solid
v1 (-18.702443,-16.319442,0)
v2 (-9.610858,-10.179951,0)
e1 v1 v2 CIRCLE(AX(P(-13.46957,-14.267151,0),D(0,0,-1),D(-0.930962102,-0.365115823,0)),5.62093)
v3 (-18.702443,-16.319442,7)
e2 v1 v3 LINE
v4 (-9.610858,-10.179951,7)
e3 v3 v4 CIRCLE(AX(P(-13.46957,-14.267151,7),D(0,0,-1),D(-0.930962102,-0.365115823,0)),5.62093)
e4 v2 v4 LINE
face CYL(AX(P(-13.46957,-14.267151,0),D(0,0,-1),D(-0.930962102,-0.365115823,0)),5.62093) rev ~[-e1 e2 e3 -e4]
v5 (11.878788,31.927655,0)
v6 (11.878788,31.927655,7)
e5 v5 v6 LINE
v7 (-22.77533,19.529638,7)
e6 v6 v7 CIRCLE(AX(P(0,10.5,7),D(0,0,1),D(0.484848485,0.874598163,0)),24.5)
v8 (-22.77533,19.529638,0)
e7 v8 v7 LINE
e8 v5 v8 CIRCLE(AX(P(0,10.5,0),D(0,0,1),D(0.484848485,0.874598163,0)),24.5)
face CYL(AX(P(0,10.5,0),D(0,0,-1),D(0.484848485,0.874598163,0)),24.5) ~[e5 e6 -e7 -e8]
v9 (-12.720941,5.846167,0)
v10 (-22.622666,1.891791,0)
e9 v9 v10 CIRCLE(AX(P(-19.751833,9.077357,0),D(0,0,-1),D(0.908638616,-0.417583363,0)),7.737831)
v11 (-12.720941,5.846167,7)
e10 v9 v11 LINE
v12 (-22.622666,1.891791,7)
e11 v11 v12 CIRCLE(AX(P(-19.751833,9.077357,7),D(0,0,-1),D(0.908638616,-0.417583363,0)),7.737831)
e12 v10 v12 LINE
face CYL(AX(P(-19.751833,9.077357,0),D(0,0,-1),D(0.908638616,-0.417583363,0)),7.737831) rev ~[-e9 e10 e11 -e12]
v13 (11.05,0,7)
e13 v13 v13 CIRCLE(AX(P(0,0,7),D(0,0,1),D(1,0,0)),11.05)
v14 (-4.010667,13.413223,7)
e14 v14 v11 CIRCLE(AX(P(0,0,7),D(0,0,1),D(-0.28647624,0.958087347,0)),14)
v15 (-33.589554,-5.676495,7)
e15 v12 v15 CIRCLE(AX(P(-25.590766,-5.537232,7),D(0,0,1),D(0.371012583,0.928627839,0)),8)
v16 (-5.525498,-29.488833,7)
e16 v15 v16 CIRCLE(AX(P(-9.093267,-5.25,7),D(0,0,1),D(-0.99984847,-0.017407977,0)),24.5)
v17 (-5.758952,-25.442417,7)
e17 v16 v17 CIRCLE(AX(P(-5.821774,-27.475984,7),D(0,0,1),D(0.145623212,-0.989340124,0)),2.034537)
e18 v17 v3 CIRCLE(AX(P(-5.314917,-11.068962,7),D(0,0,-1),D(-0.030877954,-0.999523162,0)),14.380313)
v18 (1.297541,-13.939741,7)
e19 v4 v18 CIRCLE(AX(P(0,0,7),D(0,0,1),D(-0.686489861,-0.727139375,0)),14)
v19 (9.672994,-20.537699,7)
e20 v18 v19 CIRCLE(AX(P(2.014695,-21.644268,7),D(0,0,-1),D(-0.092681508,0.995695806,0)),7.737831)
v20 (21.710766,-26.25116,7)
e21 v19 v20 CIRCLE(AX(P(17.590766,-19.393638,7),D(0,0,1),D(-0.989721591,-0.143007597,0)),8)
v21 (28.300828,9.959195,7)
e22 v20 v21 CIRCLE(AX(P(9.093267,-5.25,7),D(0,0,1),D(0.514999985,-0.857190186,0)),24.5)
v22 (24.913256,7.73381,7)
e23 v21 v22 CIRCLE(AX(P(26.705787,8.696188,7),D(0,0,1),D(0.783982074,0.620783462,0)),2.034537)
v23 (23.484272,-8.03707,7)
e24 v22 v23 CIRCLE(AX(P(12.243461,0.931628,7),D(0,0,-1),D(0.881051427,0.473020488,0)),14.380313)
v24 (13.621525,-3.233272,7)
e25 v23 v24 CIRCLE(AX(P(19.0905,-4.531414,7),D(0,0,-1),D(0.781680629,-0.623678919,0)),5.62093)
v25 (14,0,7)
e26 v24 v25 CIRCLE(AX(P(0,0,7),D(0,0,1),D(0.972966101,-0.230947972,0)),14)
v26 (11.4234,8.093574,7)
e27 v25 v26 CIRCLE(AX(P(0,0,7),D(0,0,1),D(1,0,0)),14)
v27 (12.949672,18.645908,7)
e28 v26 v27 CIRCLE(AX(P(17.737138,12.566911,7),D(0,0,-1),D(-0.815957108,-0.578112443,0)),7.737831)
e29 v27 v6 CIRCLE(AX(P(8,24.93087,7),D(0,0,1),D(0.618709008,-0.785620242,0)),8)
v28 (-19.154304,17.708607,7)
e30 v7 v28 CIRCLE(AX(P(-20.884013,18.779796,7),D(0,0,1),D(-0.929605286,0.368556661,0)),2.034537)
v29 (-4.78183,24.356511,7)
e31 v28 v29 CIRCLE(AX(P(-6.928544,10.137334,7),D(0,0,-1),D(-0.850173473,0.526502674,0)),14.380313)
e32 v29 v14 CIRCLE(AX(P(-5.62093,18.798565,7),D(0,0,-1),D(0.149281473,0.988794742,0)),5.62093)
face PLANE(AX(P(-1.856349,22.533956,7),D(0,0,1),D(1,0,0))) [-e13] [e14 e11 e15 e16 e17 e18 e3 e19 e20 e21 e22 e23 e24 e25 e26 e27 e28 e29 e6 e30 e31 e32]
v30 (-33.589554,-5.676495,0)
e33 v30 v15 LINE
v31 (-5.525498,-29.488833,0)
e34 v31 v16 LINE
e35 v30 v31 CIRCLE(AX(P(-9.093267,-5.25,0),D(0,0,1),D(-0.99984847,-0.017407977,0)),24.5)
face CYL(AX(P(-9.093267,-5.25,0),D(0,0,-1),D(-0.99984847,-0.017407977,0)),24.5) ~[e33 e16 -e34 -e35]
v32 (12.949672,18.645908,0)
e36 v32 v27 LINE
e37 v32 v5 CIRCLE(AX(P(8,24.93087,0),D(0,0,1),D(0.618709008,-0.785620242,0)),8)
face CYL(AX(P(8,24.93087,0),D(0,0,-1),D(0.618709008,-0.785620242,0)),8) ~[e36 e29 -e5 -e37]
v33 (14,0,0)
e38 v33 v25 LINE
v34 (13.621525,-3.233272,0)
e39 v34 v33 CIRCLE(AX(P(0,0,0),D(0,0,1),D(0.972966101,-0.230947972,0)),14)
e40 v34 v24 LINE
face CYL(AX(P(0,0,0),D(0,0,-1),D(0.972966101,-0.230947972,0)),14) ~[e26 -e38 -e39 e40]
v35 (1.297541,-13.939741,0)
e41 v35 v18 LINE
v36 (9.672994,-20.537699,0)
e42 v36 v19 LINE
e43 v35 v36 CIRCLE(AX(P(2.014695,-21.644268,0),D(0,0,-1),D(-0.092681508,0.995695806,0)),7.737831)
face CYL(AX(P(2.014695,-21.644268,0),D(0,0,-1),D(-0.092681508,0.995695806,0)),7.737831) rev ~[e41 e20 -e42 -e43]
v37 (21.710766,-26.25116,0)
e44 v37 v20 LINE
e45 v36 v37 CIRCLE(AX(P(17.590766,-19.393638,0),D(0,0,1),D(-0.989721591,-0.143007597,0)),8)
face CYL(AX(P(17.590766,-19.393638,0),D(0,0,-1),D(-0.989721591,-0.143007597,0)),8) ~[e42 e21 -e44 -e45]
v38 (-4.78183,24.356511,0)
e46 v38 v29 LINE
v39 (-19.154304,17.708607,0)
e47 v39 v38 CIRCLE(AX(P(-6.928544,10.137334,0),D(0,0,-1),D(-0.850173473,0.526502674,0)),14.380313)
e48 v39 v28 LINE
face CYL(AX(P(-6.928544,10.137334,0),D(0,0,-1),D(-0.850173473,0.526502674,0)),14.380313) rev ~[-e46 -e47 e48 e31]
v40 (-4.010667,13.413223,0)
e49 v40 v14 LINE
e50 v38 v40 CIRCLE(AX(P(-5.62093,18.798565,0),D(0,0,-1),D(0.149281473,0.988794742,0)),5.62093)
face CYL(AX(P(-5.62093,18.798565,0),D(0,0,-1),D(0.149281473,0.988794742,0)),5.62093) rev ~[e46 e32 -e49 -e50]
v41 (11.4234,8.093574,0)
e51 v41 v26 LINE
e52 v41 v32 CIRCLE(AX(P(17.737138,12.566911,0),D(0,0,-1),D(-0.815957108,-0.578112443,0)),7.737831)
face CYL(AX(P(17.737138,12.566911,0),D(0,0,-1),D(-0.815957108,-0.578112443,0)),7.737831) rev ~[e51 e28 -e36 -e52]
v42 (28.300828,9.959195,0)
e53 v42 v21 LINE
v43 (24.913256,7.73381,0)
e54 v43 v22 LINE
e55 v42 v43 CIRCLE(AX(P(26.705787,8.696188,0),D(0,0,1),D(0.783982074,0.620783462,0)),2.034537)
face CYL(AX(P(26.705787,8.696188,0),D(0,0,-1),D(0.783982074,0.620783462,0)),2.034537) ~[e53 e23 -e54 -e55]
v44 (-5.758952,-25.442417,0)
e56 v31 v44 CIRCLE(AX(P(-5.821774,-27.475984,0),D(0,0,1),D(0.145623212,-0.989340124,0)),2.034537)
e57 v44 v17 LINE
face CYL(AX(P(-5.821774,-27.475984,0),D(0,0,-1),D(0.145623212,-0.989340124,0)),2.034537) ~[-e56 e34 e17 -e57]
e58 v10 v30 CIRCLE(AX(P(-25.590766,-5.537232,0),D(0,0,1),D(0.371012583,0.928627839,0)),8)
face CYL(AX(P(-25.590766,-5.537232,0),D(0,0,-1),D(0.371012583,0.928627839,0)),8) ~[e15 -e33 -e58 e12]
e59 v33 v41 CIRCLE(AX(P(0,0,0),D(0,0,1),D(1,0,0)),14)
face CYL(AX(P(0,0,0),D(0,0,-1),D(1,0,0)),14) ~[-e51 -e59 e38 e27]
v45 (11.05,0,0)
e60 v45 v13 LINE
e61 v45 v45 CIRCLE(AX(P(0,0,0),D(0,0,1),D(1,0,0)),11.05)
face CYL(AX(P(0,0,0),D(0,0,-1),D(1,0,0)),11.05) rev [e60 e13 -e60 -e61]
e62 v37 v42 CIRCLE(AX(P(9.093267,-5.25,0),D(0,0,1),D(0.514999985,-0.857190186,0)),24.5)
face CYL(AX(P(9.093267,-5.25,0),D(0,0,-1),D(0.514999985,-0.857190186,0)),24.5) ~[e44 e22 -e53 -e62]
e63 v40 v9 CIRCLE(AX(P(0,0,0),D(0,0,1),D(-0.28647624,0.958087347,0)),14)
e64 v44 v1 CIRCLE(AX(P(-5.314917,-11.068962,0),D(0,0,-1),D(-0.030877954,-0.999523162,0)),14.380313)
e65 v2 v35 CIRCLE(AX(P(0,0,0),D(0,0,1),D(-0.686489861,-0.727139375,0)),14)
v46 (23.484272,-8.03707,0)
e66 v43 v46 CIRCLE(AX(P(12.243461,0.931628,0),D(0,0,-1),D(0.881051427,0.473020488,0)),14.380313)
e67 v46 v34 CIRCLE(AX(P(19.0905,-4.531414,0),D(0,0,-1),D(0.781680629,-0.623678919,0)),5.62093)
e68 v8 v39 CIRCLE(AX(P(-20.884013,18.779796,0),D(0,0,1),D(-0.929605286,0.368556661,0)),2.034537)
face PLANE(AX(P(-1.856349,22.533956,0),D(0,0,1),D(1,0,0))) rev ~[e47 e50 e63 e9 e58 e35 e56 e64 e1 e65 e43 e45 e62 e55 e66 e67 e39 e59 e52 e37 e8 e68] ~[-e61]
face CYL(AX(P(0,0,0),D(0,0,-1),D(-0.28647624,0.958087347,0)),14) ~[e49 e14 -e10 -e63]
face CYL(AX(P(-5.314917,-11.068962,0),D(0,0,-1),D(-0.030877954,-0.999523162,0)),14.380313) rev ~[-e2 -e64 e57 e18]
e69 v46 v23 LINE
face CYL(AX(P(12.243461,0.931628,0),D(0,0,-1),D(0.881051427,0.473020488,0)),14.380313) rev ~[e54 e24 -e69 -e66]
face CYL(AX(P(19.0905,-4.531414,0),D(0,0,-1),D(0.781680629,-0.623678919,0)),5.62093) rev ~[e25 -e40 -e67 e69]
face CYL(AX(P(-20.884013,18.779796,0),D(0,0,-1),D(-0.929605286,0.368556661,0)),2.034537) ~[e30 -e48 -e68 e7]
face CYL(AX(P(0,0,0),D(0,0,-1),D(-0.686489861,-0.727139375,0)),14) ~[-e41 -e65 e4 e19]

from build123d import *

# Parameters (mm, degrees)
F0_R     = 11.05
F1_DEPTH = 7


# Not quite as in the source:
# - a feature names something its author has since deleted; it is built from what else it names


with BuildPart() as f1:
    # F0 (on Top) → F1 (new body)
    with BuildSketch(Plane.XY):
        with BuildLine():
            ThreePointArc((-4.0106673609, 13.4132228536), (4.561996815, 13.2358673709), (11.4233995183, 8.0935742071))
            ThreePointArc((11.4233995183, 8.0935742071), (10.0789971933, 13.6745719731), (12.9496720608, 18.6459077574))
            ThreePointArc((12.9496720608, 18.6459077574), (15.9741224369, 25.5738093143), (11.8787878788, 31.9276549937))
            ThreePointArc((11.8787878788, 31.9276549937), (-8.2529606774, 33.568130398), (-22.7753295029, 19.5296382006))
            ThreePointArc((-22.7753295029, 19.5296382006), (-21.7981073273, 16.9621679379), (-19.1543041216, 17.7086070442))
            ThreePointArc((-19.1543041216, 17.7086070442), (-12.9655505969, 23.1890748663), (-4.7818295921, 24.3565114828))
            ThreePointArc((-4.7818295921, 24.3565114828), (-0.0139046539, 19.1936864048), (-4.0106673609, 13.4132228536))
        make_face()
        with BuildLine():
            ThreePointArc((13.6215254183, -3.2332716061), (13.9050594363, -1.6276738223), (14, 0))
            ThreePointArc((14, 0), (13.3403072164, 4.2469051522), (11.4233995183, 8.0935742071))
            ThreePointArc((11.4233995183, 8.0935742071), (4.561996815, 13.2358673709), (-4.0106673609, 13.4132228536))
            ThreePointArc((-4.0106673609, 13.4132228536), (-9.1815989768, 10.5687388192), (-12.7209406299, 5.8461670769))
            ThreePointArc((-12.7209406299, 5.8461670769), (-13.7435957918, -2.6671285517), (-9.6108580574, -10.1799512475))
            ThreePointArc((-9.6108580574, -10.1799512475), (-4.561996815, -13.2358673709), (1.2975411116, -13.939741284))
            ThreePointArc((1.2975411116, -13.939741284), (9.1815989768, -10.5687388192), (13.6215254183, -3.2332716061))
        make_face()
        Circle(F0_R, mode=Mode.SUBTRACT)
        with BuildLine():
            ThreePointArc((-9.6108580574, -10.1799512475), (-13.7435957918, -2.6671285517), (-12.7209406299, 5.8461670769))
            ThreePointArc((-12.7209406299, 5.8461670769), (-16.8820253112, 1.8913816276), (-22.6226658249, 1.8917910967))
            ThreePointArc((-22.6226658249, 1.8917910967), (-30.1346297562, 1.0470911764), (-33.5895542472, -5.6764954277))
            ThreePointArc((-33.5895542472, -5.6764954277), (-24.9443733435, -23.931338802), (-5.5254980569, -29.4888330294))
            ThreePointArc((-5.5254980569, -29.4888330294), (-3.7906146738, -27.3587986688), (-5.7589515051, -25.4424174832))
            ThreePointArc((-5.7589515051, -25.4424174832), (-13.5995526261, -22.8230336242), (-18.7024428957, -16.3194416447))
            ThreePointArc((-18.7024428957, -16.3194416447), (-16.6152676918, -9.6088849859), (-9.6108580574, -10.1799512475))
        make_face()
        with BuildLine():
            ThreePointArc((23.4842724877, -8.0370698381), (16.6291723457, -9.5848014189), (13.6215254183, -3.2332716061))
            ThreePointArc((13.6215254183, -3.2332716061), (9.1815989768, -10.5687388192), (1.2975411116, -13.939741284))
            ThreePointArc((1.2975411116, -13.939741284), (6.8030281179, -15.5659536006), (9.6729937641, -20.537698854))
            ThreePointArc((9.6729937641, -20.537698854), (14.1605073193, -26.6209004907), (21.7107663685, -26.2511595661))
            ThreePointArc((21.7107663685, -26.2511595661), (33.1973340209, -9.6367915959), (28.3008275599, 9.9591948288))
            ThreePointArc((28.3008275599, 9.9591948288), (25.5887220011, 10.3966307309), (24.9132556267, 7.733810439))
            ThreePointArc((24.9132556267, 7.733810439), (26.565103223, -0.3660412422), (23.4842724877, -8.0370698381))
        make_face()
    extrude(amount=F1_DEPTH)


solid = f1.part
